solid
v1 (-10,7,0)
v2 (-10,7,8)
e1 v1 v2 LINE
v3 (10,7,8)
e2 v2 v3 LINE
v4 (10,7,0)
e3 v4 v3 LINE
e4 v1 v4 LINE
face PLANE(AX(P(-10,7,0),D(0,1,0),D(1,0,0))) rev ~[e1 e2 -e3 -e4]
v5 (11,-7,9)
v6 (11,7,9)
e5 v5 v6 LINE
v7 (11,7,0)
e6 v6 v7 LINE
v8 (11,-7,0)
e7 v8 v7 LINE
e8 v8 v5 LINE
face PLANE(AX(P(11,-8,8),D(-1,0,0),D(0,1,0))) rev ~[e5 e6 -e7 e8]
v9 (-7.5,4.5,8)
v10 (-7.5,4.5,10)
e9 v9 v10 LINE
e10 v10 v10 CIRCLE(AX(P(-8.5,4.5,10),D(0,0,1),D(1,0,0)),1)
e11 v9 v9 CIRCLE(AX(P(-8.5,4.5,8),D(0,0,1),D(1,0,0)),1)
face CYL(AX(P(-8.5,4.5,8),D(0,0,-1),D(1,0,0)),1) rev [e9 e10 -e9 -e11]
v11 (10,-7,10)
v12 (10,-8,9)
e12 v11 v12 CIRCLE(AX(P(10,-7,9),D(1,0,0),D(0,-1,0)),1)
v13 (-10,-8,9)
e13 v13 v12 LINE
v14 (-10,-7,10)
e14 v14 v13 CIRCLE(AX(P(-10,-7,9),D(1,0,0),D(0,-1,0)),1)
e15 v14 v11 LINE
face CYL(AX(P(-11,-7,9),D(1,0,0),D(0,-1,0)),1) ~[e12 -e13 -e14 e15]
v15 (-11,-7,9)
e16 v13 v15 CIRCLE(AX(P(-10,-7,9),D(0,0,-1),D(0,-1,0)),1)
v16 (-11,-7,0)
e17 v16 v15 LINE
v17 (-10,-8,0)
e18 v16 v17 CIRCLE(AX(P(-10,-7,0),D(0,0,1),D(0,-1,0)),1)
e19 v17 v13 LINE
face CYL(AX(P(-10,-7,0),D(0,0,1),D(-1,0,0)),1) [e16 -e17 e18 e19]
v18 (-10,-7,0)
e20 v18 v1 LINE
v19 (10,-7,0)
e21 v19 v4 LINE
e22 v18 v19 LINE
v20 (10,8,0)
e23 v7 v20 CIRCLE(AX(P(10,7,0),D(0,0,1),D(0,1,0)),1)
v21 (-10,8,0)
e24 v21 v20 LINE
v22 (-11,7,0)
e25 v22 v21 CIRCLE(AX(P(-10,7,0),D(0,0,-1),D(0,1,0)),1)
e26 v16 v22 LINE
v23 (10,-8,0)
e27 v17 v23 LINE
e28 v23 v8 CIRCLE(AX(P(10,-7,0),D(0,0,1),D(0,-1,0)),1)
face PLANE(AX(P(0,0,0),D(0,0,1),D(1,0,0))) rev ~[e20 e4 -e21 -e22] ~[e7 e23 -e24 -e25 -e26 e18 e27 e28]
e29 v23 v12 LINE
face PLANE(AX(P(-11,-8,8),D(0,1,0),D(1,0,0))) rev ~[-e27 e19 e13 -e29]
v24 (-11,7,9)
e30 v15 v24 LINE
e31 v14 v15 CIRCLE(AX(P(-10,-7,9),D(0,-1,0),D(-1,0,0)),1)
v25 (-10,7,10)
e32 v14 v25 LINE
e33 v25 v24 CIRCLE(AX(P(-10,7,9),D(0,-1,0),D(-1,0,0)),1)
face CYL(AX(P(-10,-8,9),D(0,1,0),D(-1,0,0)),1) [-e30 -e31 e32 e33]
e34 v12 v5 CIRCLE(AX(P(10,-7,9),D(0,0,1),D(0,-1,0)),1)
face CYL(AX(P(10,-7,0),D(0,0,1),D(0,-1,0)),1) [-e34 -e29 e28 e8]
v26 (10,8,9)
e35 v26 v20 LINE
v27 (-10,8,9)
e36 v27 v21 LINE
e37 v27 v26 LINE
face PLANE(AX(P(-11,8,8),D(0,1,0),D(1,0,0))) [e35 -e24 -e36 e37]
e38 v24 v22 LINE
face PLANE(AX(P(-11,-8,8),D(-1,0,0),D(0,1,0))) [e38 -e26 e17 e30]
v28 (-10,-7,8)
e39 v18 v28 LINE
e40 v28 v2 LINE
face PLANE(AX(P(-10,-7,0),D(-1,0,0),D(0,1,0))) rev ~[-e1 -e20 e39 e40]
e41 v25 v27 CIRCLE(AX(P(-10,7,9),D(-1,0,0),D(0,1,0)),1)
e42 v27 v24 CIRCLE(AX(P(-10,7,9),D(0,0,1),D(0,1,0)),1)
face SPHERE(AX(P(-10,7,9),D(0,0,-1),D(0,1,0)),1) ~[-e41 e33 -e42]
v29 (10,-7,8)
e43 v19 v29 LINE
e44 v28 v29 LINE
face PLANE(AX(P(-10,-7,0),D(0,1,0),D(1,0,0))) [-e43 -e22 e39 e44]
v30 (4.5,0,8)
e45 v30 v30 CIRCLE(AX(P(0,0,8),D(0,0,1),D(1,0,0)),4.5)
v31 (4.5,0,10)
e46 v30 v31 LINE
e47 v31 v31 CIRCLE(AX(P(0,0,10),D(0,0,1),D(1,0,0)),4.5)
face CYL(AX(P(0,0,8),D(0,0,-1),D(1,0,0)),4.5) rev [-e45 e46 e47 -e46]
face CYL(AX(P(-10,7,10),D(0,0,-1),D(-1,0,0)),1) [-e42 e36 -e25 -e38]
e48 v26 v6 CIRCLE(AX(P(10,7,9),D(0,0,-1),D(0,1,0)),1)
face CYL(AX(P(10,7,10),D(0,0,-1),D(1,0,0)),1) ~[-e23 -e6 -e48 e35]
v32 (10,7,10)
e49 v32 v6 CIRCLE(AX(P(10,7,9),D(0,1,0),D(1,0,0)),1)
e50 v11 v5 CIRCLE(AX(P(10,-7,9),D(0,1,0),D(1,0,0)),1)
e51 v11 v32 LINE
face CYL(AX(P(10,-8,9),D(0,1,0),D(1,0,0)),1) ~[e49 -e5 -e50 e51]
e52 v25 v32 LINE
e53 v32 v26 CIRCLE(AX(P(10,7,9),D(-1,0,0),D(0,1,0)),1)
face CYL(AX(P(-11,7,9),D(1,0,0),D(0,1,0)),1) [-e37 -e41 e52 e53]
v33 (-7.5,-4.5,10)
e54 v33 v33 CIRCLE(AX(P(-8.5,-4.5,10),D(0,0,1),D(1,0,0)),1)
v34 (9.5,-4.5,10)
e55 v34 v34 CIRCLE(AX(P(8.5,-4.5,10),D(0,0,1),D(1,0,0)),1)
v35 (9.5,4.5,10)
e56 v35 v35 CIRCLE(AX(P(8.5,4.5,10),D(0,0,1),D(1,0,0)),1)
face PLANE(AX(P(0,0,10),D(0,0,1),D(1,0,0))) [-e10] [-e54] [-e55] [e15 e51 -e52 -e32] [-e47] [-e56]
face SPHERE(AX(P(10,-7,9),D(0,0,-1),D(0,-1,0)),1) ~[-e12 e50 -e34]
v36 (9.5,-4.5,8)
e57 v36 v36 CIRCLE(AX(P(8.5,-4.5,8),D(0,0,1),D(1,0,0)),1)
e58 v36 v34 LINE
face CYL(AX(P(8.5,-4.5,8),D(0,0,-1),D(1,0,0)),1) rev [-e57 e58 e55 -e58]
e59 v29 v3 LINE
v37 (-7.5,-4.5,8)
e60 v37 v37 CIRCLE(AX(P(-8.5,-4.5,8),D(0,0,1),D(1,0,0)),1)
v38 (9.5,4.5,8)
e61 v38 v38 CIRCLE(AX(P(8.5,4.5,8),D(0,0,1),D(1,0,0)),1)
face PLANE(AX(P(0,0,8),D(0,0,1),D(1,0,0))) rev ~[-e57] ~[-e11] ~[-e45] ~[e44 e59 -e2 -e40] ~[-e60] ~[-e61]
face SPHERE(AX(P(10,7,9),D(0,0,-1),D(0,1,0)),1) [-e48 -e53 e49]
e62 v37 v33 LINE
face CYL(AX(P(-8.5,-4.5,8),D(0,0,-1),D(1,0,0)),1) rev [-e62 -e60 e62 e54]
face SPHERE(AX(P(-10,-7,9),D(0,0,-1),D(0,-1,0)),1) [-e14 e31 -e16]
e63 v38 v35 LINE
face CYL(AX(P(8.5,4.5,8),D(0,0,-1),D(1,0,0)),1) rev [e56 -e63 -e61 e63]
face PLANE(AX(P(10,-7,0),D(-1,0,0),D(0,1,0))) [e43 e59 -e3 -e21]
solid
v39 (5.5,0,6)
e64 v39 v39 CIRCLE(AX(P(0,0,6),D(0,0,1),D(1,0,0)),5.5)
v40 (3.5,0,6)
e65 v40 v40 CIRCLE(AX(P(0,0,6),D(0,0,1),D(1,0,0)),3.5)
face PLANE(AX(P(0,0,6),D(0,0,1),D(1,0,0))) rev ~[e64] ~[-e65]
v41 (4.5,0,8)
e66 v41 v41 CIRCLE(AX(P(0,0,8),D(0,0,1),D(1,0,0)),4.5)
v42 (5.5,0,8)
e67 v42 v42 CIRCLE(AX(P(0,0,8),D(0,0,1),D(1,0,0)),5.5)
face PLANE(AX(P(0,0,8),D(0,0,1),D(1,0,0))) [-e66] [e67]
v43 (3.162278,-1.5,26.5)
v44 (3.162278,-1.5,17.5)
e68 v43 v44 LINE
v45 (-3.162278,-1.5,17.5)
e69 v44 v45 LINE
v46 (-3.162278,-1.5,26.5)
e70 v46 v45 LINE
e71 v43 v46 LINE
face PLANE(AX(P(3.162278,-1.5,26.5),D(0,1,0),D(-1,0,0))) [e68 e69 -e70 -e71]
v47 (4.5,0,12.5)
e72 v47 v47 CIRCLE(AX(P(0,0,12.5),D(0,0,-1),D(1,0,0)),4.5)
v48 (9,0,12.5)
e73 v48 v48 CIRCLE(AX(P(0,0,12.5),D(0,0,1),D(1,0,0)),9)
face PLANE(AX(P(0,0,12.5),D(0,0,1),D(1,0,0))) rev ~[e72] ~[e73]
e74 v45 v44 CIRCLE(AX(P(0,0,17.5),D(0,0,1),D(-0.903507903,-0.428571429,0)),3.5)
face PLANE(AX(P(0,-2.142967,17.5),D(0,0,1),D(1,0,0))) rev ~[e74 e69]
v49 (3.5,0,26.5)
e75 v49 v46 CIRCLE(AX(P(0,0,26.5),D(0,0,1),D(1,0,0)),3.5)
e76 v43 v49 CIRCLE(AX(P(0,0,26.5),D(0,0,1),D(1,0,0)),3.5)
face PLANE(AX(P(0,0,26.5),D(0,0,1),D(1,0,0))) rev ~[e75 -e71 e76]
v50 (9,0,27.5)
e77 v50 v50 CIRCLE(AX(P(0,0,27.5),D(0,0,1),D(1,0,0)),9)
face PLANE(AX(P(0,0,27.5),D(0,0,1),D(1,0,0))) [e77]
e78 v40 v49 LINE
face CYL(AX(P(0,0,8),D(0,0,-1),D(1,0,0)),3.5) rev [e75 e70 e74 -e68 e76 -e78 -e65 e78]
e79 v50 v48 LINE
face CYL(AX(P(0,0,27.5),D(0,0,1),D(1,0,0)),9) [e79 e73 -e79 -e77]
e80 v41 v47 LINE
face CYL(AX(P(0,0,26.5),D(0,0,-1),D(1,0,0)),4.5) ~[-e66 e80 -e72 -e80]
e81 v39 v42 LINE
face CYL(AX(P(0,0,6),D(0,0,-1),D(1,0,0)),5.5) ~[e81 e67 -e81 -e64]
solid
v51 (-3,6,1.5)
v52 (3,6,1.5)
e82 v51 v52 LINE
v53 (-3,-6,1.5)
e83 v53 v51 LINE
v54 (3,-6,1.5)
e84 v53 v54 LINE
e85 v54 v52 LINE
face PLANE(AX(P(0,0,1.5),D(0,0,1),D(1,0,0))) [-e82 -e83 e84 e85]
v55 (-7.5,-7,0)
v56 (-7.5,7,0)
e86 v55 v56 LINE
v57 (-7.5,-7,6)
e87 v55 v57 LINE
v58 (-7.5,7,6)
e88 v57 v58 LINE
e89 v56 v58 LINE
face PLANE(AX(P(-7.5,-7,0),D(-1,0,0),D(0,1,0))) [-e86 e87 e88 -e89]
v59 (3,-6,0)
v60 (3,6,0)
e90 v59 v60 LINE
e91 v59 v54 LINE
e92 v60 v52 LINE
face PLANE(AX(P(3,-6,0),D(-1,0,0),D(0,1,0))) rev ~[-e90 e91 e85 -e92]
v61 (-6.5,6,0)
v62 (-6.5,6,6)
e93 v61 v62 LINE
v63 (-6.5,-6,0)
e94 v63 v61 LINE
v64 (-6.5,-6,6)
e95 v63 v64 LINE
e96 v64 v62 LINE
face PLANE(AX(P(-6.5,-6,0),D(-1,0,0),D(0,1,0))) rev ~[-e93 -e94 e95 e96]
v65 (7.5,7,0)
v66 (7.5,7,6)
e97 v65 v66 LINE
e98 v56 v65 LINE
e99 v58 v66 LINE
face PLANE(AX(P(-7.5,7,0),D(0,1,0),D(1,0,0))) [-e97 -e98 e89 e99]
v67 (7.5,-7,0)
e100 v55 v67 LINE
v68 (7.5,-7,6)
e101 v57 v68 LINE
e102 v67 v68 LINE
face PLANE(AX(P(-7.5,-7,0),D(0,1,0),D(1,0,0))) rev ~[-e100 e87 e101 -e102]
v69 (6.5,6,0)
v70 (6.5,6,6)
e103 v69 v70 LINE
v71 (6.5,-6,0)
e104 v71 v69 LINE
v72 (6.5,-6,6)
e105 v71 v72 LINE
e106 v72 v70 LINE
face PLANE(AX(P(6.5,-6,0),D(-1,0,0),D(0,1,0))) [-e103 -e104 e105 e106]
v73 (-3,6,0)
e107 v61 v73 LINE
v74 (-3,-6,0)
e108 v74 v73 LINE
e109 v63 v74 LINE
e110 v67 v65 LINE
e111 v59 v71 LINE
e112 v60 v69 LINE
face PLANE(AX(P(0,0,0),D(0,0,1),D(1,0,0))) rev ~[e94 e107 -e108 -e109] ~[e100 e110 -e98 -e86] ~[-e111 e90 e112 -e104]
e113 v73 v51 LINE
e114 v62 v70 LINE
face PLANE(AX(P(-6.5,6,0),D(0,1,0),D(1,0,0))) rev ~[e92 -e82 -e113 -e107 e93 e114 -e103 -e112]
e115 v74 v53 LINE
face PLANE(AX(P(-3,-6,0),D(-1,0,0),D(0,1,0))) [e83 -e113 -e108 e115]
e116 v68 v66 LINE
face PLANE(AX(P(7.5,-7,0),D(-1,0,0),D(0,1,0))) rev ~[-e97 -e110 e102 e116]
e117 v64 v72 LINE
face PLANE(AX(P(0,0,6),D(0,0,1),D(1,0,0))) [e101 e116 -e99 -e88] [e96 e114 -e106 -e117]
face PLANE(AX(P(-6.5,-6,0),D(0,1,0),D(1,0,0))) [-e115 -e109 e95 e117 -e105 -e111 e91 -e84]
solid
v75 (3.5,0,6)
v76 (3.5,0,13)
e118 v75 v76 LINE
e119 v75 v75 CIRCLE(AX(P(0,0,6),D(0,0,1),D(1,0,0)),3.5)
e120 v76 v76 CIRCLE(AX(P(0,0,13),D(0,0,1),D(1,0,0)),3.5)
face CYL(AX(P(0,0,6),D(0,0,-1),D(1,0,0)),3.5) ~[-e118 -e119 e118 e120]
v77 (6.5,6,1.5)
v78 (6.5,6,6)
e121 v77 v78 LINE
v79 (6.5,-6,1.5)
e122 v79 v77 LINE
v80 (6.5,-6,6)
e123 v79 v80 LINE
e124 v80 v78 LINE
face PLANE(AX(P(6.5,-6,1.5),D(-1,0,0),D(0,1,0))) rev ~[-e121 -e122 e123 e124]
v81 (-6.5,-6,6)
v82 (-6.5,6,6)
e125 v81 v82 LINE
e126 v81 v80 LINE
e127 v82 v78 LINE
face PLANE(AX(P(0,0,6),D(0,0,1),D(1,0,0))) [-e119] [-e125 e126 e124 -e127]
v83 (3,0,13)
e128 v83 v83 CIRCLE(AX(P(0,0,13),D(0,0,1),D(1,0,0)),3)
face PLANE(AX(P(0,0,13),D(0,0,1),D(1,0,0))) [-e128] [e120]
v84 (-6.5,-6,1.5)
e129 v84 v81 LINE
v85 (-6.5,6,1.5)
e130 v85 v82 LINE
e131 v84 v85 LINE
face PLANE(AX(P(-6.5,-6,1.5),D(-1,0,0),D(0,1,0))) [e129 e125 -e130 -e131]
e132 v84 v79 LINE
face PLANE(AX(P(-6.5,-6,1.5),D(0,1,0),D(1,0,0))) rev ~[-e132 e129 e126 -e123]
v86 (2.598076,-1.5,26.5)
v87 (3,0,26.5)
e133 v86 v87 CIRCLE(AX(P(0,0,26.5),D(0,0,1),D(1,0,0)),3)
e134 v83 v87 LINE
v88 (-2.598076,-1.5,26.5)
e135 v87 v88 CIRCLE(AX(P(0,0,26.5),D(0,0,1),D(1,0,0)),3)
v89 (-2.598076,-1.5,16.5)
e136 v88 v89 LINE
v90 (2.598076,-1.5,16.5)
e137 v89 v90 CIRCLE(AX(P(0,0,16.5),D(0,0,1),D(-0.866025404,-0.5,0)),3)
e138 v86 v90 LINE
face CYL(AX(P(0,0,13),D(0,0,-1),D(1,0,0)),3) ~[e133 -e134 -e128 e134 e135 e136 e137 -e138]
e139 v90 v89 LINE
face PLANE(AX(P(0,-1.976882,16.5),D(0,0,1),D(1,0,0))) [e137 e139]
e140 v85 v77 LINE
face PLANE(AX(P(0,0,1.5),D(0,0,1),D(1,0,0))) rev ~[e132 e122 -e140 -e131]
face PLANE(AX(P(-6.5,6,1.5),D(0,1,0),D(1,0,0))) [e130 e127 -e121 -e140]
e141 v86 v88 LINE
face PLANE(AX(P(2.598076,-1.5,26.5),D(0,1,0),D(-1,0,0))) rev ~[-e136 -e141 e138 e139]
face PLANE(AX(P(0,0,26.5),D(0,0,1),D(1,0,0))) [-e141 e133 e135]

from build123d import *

# Parameters (mm, degrees)
F0_W      = 15
F0_H      = 14
F0_W_2    = 13
F0_H_2    = 12
F1_DEPTH  = 6
F2_W      = 6
F2_H      = 12
F3_DEPTH  = 1.5
F4_W      = 13
F4_H      = 12
F5_DEPTH  = 4.5
F6_R      = 3.5
F7_DEPTH  = 7
F8_R      = 3
F9_DEPTH  = 13.5
F11_DEPTH = 10
F12_W     = 22
F12_H     = 16
F12_W_2   = 20
F12_H_2   = 14
F13_DEPTH = 8
F14_W     = 22
F14_H     = 16
F14_R     = 1
F14_R_2   = 4.5
F15_DEPTH = 2
F16_R     = 1
F18_R     = 5.5
F18_R_2   = 3.5
F19_DEPTH = 2
F20_R     = 4.5
F20_R_2   = 3.5
F21_DEPTH = 18.5
F23_DEPTH = 9
F24_R     = 4.5
F25_DEPTH = 1
F26_R     = 9
F26_R_2   = 3.5
F27_DEPTH = 15


with BuildPart() as f1:
    # F0 (on Top) → F1 (new body)
    with BuildSketch(Plane.XY):
        Rectangle(F0_W, F0_H)
        Rectangle(F0_W_2, F0_H_2, mode=Mode.SUBTRACT)
    extrude(amount=F1_DEPTH)

    # F2 (on Top) → F3 (join)
    with BuildSketch(Plane.XY):
        Rectangle(F2_W, F2_H)
    extrude(amount=F3_DEPTH)


with BuildPart() as f5:
    # F4 (on face) → F5 (new body)
    with BuildSketch(Plane.XY.offset(1.5)):
        Rectangle(F4_W, F4_H)
    extrude(amount=F5_DEPTH)

    # F6 (on face) → F7 (join)
    with BuildSketch(Plane.XY.offset(6)):
        Circle(F6_R)
    extrude(amount=F7_DEPTH)

    # F8 (on face) → F9 (join)
    with BuildSketch(Plane.XY.offset(13)):
        Circle(F8_R)
    extrude(amount=F9_DEPTH)

    # F10 (on face) → F11 (cut)
    with BuildSketch(Plane.XY.offset(26.5)):
        with BuildLine():
            Line((2.5980762114, -1.5), (-2.5980762114, -1.5))
            ThreePointArc((-2.5980762114, -1.5), (0, -3), (2.5980762114, -1.5))
        make_face()
    extrude(amount=-F11_DEPTH, mode=Mode.SUBTRACT)


with BuildPart() as f13:
    # F12 (on Top) → F13 (new body)
    with BuildSketch(Plane.XY):
        Rectangle(F12_W, F12_H)
        Rectangle(F12_W_2, F12_H_2, mode=Mode.SUBTRACT)
    extrude(amount=F13_DEPTH)

    # F14 (on face) → F15 (join)
    with BuildSketch(Plane.XY.offset(8)):
        Rectangle(F14_W, F14_H)
        with Locations((-8.5, -4.5)):
            Circle(F14_R, mode=Mode.SUBTRACT)
        with Locations((8.5, -4.5)):
            Circle(F14_R, mode=Mode.SUBTRACT)
        with Locations((-8.5, 4.5)):
            Circle(F14_R, mode=Mode.SUBTRACT)
        Circle(F14_R_2, mode=Mode.SUBTRACT)
        with Locations((8.5, 4.5)):
            Circle(F14_R, mode=Mode.SUBTRACT)
    extrude(amount=F15_DEPTH)

    # F16
    f16_edges = [f13.edges().sort_by_distance(p)[0] for p in [
        (-11, -8, 5),
        (11, -8, 5),
        (11, 8, 5),
        (-11, 8, 5),
        (0, -8, 10),
        (0, 8, 10),
        (-11, 0, 10),
        (11, 0, 10),
    ]]
    fillet(f16_edges, radius=F16_R)


with BuildPart() as f19:
    # F18 (on offset) → F19 (new body)
    with BuildSketch(Plane.XY.offset(6)):
        Circle(F18_R)
        Circle(F18_R_2, mode=Mode.SUBTRACT)
    extrude(amount=F19_DEPTH)

    # F20 (on face) → F21 (join)
    with BuildSketch(Plane.XY.offset(8)):
        Circle(F20_R)
        Circle(F20_R_2, mode=Mode.SUBTRACT)
    extrude(amount=F21_DEPTH)

    # F22 (on face) → F23 (join)
    with BuildSketch(Plane.XY.offset(26.5)):
        with BuildLine():
            Line((3.1622776602, -1.5), (-3.1622776602, -1.5))
            ThreePointArc((-3.1622776602, -1.5), (0, -3.5), (3.1622776602, -1.5))
        make_face()
    extrude(amount=-F23_DEPTH)

    # F24 (on face) → F25 (join)
    with BuildSketch(Plane.XY.offset(26.5)):
        Circle(F24_R)
    extrude(amount=F25_DEPTH)

    # F26 (on face) → F27 (join)
    with BuildSketch(Plane.XY.offset(27.5)):
        Circle(F26_R)
        Circle(F26_R_2, mode=Mode.SUBTRACT)
    extrude(amount=-F27_DEPTH)


solid = Compound([f1.part, f5.part, f13.part, f19.part])
